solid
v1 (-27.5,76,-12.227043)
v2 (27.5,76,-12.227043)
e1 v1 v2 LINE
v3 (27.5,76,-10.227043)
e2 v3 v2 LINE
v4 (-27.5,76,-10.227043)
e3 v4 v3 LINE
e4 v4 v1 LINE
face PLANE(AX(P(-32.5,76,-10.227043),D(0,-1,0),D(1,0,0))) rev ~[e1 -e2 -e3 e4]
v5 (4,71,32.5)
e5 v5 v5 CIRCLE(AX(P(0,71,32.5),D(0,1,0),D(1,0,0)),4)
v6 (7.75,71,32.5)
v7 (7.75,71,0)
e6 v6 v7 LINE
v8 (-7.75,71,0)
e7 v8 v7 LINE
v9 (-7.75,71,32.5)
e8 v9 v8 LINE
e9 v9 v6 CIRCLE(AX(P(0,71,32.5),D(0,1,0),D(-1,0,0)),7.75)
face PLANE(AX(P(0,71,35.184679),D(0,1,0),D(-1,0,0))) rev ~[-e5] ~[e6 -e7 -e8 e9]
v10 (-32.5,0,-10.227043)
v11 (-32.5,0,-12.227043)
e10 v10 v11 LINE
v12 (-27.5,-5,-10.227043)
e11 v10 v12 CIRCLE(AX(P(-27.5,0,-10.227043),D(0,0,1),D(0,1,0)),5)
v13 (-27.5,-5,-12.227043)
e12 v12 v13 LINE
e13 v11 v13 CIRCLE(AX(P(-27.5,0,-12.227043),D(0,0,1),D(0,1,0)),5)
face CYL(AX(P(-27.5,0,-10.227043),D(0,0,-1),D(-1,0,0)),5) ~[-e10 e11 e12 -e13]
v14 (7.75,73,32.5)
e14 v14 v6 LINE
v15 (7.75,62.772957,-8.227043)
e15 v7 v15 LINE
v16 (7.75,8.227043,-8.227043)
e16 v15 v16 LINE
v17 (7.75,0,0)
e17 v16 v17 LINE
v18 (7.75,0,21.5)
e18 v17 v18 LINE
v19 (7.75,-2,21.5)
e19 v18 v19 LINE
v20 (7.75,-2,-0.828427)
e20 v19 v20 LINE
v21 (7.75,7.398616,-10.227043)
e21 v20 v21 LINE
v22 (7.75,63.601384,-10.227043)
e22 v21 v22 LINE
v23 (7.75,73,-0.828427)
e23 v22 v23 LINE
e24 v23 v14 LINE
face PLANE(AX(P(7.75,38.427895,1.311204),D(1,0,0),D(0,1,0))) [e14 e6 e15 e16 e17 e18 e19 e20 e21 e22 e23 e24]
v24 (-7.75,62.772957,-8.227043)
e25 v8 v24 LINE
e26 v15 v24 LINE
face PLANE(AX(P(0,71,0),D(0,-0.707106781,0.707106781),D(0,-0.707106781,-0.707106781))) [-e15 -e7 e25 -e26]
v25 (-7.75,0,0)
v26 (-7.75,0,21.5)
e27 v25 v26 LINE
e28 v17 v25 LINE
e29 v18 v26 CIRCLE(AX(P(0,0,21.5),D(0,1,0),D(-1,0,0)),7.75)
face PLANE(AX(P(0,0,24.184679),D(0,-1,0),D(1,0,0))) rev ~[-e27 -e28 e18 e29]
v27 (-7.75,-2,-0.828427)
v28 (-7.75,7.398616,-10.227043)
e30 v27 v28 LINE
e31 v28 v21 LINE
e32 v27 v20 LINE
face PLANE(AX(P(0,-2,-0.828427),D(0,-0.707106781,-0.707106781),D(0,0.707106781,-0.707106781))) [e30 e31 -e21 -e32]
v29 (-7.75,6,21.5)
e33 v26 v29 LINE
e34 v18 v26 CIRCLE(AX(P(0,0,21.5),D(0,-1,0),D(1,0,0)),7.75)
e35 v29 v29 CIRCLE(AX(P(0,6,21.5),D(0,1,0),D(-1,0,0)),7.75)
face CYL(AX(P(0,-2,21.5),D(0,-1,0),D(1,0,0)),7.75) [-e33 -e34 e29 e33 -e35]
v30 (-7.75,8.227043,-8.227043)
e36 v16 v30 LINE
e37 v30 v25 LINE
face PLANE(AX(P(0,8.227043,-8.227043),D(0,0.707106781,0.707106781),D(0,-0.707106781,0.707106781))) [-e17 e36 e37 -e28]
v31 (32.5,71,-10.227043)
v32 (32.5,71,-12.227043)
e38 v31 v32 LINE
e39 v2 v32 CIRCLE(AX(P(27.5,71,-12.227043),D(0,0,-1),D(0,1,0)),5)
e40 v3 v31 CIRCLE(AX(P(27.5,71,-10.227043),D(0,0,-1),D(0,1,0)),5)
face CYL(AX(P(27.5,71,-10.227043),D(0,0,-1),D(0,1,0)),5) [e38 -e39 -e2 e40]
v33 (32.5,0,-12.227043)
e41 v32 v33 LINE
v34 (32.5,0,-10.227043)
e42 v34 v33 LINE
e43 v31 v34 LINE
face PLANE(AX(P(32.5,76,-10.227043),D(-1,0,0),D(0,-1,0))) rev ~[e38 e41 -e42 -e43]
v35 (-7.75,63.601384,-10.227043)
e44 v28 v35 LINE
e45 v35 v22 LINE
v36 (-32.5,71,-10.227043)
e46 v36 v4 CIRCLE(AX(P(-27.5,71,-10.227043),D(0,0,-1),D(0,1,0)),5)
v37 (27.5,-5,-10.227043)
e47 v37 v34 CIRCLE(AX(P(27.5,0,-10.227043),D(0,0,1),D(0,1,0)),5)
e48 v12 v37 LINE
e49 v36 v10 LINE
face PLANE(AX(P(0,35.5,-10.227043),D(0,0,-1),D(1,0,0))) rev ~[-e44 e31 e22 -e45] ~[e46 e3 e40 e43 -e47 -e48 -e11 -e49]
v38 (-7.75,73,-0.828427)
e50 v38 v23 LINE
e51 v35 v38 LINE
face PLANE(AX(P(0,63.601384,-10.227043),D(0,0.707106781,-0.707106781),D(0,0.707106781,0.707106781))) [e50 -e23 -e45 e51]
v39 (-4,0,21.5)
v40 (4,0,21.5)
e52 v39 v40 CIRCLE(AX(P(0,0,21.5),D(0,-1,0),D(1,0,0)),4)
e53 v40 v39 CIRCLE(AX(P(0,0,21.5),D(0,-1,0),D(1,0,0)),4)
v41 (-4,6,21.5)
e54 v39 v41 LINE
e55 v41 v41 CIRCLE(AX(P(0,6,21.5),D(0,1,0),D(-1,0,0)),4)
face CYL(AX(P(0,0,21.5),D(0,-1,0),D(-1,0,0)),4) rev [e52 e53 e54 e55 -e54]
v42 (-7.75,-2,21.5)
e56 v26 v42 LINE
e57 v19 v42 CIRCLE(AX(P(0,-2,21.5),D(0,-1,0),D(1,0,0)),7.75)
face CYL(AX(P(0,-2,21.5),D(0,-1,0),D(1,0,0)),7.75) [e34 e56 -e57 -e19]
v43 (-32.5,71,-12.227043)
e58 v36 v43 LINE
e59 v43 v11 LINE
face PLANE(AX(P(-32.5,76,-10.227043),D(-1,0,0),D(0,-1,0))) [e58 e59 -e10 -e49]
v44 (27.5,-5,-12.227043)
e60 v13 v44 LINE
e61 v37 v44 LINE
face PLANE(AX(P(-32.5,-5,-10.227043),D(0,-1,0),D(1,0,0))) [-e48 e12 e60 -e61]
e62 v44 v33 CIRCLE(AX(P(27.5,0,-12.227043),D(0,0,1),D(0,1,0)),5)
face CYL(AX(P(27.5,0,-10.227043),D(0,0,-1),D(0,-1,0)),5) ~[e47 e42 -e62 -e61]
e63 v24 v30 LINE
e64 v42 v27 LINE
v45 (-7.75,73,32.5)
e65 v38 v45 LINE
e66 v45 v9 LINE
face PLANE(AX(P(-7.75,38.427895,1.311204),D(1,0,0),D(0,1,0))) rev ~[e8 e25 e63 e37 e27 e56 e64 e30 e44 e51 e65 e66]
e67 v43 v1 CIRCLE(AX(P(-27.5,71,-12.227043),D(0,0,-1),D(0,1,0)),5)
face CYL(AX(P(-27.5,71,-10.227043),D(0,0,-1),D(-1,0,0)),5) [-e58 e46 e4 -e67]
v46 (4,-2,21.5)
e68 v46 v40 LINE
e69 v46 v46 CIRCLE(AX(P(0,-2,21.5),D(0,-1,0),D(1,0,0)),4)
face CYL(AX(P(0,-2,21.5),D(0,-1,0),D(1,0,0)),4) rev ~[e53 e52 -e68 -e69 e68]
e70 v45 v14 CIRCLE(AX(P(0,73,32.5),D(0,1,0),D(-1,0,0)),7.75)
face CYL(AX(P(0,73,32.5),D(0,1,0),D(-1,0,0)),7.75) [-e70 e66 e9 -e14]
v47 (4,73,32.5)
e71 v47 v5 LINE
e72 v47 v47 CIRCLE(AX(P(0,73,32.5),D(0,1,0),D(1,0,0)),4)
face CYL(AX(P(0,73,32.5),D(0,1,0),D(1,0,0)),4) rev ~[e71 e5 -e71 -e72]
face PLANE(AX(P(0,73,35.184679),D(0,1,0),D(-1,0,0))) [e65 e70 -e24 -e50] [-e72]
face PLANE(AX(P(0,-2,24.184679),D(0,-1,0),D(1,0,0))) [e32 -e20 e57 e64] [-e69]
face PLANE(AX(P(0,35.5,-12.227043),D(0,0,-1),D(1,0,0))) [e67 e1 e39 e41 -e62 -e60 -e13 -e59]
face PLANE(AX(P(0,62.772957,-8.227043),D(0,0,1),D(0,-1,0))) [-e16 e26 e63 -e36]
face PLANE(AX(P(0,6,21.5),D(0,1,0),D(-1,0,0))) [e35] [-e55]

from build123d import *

# Parameters (mm, degrees)
F1_DEPTH  = 7.75
F3_DEPTH  = 2
F4_R      = 4
F5_DEPTH  = 2
F6_R      = 4
F7_DEPTH  = 6
F9_DEPTH  = 2
F11_DEPTH = 2
F12_W     = 65
F12_H     = 81
F12_W_2   = 15.5
F12_H_2   = 56.2027688981
F13_DEPTH = 2
F14_R     = 5


with BuildPart() as f1:
    # F0 (on Right) → F1 (new body, symmetric)
    with BuildSketch(Plane.YZ):
        Polygon((0, 0), (0, 21.5), (-2, 21.5), (-2, -0.8284271247), (7.398615551, -10.2270426757), (56.688359309, -10.2270426757), (63.601384449, -10.2270426757), (73, -0.8284271247), (73, 32.5), (71, 32.5), (71, 0), (62.7729573243, -8.2270426757), (8.2270426757, -8.2270426757), align=None)
    extrude(amount=F1_DEPTH, both=True)

    # F2 (on face) → F3 (join)
    with BuildSketch(Plane.XZ.offset(2)):
        with BuildLine():
            Line((-7.75, 21.5), (7.75, 21.5))
            ThreePointArc((7.75, 21.5), (0, 29.25), (-7.75, 21.5))
        make_face()
    extrude(amount=-F3_DEPTH)

    # F4 (on face) → F5 (cut)
    with BuildSketch(Plane.XZ.offset(2)):
        with Locations((0, 21.5)):
            Circle(F4_R)
    extrude(amount=-F5_DEPTH, mode=Mode.SUBTRACT)

    # F6 (on face) → F7 (join)
    with BuildSketch(Plane(origin=(0, 0, 0), x_dir=(-1, 0, 0), z_dir=(0, 1, 0))):
        with BuildLine():
            ThreePointArc((-7.75, 21.5), (0, 13.75), (7.75, 21.5))
            ThreePointArc((7.75, 21.5), (0, 29.25), (-7.75, 21.5))
        make_face()
        with Locations((0, 21.5)):
            Circle(F6_R, mode=Mode.SUBTRACT)
    extrude(amount=F7_DEPTH)

    # F8 (on face) → F9 (join)
    with BuildSketch(Plane(origin=(0, 73, 0), x_dir=(-1, 0, 0), z_dir=(0, 1, 0))):
        with BuildLine():
            Line((-7.75, 32.5), (7.75, 32.5))
            ThreePointArc((7.75, 32.5), (0, 40.25), (-7.75, 32.5))
        make_face()
    extrude(amount=-F9_DEPTH)

    # F10 (on face) → F11 (cut)
    with BuildSketch(Plane(origin=(0, 73, 0), x_dir=(-1, 0, 0), z_dir=(0, 1, 0))):
        with BuildLine():
            Line((-4, 32.5), (4, 32.5))
            ThreePointArc((4, 32.5), (0, 36.5), (-4, 32.5))
        make_face()
        with BuildLine():
            ThreePointArc((-4, 32.5), (0, 28.5), (4, 32.5))
            Line((4, 32.5), (-4, 32.5))
        make_face()
    extrude(amount=-F11_DEPTH, mode=Mode.SUBTRACT)

    # F12 (on face) → F13 (join)
    with BuildSketch(Plane(origin=(0, 0, -10.2270426757), x_dir=(1, 0, 0), z_dir=(0, 0, -1))):
        with Locations((0, -35.5)):
            Rectangle(F12_W, F12_H)
        with Locations((0, -35.5)):
            Rectangle(F12_W_2, F12_H_2, mode=Mode.SUBTRACT)
        with Locations((0, -35.5)):
            Rectangle(F12_W_2, F12_H_2)
    extrude(amount=F13_DEPTH)

    # F14
    f14_edges = [f1.edges().sort_by_distance(p)[0] for p in [
        (32.5, -5, -11.227043),
        (-32.5, -5, -11.227043),
        (-32.5, 76, -11.227043),
        (32.5, 76, -11.227043),
    ]]
    fillet(f14_edges, radius=F14_R)


solid = f1.part
